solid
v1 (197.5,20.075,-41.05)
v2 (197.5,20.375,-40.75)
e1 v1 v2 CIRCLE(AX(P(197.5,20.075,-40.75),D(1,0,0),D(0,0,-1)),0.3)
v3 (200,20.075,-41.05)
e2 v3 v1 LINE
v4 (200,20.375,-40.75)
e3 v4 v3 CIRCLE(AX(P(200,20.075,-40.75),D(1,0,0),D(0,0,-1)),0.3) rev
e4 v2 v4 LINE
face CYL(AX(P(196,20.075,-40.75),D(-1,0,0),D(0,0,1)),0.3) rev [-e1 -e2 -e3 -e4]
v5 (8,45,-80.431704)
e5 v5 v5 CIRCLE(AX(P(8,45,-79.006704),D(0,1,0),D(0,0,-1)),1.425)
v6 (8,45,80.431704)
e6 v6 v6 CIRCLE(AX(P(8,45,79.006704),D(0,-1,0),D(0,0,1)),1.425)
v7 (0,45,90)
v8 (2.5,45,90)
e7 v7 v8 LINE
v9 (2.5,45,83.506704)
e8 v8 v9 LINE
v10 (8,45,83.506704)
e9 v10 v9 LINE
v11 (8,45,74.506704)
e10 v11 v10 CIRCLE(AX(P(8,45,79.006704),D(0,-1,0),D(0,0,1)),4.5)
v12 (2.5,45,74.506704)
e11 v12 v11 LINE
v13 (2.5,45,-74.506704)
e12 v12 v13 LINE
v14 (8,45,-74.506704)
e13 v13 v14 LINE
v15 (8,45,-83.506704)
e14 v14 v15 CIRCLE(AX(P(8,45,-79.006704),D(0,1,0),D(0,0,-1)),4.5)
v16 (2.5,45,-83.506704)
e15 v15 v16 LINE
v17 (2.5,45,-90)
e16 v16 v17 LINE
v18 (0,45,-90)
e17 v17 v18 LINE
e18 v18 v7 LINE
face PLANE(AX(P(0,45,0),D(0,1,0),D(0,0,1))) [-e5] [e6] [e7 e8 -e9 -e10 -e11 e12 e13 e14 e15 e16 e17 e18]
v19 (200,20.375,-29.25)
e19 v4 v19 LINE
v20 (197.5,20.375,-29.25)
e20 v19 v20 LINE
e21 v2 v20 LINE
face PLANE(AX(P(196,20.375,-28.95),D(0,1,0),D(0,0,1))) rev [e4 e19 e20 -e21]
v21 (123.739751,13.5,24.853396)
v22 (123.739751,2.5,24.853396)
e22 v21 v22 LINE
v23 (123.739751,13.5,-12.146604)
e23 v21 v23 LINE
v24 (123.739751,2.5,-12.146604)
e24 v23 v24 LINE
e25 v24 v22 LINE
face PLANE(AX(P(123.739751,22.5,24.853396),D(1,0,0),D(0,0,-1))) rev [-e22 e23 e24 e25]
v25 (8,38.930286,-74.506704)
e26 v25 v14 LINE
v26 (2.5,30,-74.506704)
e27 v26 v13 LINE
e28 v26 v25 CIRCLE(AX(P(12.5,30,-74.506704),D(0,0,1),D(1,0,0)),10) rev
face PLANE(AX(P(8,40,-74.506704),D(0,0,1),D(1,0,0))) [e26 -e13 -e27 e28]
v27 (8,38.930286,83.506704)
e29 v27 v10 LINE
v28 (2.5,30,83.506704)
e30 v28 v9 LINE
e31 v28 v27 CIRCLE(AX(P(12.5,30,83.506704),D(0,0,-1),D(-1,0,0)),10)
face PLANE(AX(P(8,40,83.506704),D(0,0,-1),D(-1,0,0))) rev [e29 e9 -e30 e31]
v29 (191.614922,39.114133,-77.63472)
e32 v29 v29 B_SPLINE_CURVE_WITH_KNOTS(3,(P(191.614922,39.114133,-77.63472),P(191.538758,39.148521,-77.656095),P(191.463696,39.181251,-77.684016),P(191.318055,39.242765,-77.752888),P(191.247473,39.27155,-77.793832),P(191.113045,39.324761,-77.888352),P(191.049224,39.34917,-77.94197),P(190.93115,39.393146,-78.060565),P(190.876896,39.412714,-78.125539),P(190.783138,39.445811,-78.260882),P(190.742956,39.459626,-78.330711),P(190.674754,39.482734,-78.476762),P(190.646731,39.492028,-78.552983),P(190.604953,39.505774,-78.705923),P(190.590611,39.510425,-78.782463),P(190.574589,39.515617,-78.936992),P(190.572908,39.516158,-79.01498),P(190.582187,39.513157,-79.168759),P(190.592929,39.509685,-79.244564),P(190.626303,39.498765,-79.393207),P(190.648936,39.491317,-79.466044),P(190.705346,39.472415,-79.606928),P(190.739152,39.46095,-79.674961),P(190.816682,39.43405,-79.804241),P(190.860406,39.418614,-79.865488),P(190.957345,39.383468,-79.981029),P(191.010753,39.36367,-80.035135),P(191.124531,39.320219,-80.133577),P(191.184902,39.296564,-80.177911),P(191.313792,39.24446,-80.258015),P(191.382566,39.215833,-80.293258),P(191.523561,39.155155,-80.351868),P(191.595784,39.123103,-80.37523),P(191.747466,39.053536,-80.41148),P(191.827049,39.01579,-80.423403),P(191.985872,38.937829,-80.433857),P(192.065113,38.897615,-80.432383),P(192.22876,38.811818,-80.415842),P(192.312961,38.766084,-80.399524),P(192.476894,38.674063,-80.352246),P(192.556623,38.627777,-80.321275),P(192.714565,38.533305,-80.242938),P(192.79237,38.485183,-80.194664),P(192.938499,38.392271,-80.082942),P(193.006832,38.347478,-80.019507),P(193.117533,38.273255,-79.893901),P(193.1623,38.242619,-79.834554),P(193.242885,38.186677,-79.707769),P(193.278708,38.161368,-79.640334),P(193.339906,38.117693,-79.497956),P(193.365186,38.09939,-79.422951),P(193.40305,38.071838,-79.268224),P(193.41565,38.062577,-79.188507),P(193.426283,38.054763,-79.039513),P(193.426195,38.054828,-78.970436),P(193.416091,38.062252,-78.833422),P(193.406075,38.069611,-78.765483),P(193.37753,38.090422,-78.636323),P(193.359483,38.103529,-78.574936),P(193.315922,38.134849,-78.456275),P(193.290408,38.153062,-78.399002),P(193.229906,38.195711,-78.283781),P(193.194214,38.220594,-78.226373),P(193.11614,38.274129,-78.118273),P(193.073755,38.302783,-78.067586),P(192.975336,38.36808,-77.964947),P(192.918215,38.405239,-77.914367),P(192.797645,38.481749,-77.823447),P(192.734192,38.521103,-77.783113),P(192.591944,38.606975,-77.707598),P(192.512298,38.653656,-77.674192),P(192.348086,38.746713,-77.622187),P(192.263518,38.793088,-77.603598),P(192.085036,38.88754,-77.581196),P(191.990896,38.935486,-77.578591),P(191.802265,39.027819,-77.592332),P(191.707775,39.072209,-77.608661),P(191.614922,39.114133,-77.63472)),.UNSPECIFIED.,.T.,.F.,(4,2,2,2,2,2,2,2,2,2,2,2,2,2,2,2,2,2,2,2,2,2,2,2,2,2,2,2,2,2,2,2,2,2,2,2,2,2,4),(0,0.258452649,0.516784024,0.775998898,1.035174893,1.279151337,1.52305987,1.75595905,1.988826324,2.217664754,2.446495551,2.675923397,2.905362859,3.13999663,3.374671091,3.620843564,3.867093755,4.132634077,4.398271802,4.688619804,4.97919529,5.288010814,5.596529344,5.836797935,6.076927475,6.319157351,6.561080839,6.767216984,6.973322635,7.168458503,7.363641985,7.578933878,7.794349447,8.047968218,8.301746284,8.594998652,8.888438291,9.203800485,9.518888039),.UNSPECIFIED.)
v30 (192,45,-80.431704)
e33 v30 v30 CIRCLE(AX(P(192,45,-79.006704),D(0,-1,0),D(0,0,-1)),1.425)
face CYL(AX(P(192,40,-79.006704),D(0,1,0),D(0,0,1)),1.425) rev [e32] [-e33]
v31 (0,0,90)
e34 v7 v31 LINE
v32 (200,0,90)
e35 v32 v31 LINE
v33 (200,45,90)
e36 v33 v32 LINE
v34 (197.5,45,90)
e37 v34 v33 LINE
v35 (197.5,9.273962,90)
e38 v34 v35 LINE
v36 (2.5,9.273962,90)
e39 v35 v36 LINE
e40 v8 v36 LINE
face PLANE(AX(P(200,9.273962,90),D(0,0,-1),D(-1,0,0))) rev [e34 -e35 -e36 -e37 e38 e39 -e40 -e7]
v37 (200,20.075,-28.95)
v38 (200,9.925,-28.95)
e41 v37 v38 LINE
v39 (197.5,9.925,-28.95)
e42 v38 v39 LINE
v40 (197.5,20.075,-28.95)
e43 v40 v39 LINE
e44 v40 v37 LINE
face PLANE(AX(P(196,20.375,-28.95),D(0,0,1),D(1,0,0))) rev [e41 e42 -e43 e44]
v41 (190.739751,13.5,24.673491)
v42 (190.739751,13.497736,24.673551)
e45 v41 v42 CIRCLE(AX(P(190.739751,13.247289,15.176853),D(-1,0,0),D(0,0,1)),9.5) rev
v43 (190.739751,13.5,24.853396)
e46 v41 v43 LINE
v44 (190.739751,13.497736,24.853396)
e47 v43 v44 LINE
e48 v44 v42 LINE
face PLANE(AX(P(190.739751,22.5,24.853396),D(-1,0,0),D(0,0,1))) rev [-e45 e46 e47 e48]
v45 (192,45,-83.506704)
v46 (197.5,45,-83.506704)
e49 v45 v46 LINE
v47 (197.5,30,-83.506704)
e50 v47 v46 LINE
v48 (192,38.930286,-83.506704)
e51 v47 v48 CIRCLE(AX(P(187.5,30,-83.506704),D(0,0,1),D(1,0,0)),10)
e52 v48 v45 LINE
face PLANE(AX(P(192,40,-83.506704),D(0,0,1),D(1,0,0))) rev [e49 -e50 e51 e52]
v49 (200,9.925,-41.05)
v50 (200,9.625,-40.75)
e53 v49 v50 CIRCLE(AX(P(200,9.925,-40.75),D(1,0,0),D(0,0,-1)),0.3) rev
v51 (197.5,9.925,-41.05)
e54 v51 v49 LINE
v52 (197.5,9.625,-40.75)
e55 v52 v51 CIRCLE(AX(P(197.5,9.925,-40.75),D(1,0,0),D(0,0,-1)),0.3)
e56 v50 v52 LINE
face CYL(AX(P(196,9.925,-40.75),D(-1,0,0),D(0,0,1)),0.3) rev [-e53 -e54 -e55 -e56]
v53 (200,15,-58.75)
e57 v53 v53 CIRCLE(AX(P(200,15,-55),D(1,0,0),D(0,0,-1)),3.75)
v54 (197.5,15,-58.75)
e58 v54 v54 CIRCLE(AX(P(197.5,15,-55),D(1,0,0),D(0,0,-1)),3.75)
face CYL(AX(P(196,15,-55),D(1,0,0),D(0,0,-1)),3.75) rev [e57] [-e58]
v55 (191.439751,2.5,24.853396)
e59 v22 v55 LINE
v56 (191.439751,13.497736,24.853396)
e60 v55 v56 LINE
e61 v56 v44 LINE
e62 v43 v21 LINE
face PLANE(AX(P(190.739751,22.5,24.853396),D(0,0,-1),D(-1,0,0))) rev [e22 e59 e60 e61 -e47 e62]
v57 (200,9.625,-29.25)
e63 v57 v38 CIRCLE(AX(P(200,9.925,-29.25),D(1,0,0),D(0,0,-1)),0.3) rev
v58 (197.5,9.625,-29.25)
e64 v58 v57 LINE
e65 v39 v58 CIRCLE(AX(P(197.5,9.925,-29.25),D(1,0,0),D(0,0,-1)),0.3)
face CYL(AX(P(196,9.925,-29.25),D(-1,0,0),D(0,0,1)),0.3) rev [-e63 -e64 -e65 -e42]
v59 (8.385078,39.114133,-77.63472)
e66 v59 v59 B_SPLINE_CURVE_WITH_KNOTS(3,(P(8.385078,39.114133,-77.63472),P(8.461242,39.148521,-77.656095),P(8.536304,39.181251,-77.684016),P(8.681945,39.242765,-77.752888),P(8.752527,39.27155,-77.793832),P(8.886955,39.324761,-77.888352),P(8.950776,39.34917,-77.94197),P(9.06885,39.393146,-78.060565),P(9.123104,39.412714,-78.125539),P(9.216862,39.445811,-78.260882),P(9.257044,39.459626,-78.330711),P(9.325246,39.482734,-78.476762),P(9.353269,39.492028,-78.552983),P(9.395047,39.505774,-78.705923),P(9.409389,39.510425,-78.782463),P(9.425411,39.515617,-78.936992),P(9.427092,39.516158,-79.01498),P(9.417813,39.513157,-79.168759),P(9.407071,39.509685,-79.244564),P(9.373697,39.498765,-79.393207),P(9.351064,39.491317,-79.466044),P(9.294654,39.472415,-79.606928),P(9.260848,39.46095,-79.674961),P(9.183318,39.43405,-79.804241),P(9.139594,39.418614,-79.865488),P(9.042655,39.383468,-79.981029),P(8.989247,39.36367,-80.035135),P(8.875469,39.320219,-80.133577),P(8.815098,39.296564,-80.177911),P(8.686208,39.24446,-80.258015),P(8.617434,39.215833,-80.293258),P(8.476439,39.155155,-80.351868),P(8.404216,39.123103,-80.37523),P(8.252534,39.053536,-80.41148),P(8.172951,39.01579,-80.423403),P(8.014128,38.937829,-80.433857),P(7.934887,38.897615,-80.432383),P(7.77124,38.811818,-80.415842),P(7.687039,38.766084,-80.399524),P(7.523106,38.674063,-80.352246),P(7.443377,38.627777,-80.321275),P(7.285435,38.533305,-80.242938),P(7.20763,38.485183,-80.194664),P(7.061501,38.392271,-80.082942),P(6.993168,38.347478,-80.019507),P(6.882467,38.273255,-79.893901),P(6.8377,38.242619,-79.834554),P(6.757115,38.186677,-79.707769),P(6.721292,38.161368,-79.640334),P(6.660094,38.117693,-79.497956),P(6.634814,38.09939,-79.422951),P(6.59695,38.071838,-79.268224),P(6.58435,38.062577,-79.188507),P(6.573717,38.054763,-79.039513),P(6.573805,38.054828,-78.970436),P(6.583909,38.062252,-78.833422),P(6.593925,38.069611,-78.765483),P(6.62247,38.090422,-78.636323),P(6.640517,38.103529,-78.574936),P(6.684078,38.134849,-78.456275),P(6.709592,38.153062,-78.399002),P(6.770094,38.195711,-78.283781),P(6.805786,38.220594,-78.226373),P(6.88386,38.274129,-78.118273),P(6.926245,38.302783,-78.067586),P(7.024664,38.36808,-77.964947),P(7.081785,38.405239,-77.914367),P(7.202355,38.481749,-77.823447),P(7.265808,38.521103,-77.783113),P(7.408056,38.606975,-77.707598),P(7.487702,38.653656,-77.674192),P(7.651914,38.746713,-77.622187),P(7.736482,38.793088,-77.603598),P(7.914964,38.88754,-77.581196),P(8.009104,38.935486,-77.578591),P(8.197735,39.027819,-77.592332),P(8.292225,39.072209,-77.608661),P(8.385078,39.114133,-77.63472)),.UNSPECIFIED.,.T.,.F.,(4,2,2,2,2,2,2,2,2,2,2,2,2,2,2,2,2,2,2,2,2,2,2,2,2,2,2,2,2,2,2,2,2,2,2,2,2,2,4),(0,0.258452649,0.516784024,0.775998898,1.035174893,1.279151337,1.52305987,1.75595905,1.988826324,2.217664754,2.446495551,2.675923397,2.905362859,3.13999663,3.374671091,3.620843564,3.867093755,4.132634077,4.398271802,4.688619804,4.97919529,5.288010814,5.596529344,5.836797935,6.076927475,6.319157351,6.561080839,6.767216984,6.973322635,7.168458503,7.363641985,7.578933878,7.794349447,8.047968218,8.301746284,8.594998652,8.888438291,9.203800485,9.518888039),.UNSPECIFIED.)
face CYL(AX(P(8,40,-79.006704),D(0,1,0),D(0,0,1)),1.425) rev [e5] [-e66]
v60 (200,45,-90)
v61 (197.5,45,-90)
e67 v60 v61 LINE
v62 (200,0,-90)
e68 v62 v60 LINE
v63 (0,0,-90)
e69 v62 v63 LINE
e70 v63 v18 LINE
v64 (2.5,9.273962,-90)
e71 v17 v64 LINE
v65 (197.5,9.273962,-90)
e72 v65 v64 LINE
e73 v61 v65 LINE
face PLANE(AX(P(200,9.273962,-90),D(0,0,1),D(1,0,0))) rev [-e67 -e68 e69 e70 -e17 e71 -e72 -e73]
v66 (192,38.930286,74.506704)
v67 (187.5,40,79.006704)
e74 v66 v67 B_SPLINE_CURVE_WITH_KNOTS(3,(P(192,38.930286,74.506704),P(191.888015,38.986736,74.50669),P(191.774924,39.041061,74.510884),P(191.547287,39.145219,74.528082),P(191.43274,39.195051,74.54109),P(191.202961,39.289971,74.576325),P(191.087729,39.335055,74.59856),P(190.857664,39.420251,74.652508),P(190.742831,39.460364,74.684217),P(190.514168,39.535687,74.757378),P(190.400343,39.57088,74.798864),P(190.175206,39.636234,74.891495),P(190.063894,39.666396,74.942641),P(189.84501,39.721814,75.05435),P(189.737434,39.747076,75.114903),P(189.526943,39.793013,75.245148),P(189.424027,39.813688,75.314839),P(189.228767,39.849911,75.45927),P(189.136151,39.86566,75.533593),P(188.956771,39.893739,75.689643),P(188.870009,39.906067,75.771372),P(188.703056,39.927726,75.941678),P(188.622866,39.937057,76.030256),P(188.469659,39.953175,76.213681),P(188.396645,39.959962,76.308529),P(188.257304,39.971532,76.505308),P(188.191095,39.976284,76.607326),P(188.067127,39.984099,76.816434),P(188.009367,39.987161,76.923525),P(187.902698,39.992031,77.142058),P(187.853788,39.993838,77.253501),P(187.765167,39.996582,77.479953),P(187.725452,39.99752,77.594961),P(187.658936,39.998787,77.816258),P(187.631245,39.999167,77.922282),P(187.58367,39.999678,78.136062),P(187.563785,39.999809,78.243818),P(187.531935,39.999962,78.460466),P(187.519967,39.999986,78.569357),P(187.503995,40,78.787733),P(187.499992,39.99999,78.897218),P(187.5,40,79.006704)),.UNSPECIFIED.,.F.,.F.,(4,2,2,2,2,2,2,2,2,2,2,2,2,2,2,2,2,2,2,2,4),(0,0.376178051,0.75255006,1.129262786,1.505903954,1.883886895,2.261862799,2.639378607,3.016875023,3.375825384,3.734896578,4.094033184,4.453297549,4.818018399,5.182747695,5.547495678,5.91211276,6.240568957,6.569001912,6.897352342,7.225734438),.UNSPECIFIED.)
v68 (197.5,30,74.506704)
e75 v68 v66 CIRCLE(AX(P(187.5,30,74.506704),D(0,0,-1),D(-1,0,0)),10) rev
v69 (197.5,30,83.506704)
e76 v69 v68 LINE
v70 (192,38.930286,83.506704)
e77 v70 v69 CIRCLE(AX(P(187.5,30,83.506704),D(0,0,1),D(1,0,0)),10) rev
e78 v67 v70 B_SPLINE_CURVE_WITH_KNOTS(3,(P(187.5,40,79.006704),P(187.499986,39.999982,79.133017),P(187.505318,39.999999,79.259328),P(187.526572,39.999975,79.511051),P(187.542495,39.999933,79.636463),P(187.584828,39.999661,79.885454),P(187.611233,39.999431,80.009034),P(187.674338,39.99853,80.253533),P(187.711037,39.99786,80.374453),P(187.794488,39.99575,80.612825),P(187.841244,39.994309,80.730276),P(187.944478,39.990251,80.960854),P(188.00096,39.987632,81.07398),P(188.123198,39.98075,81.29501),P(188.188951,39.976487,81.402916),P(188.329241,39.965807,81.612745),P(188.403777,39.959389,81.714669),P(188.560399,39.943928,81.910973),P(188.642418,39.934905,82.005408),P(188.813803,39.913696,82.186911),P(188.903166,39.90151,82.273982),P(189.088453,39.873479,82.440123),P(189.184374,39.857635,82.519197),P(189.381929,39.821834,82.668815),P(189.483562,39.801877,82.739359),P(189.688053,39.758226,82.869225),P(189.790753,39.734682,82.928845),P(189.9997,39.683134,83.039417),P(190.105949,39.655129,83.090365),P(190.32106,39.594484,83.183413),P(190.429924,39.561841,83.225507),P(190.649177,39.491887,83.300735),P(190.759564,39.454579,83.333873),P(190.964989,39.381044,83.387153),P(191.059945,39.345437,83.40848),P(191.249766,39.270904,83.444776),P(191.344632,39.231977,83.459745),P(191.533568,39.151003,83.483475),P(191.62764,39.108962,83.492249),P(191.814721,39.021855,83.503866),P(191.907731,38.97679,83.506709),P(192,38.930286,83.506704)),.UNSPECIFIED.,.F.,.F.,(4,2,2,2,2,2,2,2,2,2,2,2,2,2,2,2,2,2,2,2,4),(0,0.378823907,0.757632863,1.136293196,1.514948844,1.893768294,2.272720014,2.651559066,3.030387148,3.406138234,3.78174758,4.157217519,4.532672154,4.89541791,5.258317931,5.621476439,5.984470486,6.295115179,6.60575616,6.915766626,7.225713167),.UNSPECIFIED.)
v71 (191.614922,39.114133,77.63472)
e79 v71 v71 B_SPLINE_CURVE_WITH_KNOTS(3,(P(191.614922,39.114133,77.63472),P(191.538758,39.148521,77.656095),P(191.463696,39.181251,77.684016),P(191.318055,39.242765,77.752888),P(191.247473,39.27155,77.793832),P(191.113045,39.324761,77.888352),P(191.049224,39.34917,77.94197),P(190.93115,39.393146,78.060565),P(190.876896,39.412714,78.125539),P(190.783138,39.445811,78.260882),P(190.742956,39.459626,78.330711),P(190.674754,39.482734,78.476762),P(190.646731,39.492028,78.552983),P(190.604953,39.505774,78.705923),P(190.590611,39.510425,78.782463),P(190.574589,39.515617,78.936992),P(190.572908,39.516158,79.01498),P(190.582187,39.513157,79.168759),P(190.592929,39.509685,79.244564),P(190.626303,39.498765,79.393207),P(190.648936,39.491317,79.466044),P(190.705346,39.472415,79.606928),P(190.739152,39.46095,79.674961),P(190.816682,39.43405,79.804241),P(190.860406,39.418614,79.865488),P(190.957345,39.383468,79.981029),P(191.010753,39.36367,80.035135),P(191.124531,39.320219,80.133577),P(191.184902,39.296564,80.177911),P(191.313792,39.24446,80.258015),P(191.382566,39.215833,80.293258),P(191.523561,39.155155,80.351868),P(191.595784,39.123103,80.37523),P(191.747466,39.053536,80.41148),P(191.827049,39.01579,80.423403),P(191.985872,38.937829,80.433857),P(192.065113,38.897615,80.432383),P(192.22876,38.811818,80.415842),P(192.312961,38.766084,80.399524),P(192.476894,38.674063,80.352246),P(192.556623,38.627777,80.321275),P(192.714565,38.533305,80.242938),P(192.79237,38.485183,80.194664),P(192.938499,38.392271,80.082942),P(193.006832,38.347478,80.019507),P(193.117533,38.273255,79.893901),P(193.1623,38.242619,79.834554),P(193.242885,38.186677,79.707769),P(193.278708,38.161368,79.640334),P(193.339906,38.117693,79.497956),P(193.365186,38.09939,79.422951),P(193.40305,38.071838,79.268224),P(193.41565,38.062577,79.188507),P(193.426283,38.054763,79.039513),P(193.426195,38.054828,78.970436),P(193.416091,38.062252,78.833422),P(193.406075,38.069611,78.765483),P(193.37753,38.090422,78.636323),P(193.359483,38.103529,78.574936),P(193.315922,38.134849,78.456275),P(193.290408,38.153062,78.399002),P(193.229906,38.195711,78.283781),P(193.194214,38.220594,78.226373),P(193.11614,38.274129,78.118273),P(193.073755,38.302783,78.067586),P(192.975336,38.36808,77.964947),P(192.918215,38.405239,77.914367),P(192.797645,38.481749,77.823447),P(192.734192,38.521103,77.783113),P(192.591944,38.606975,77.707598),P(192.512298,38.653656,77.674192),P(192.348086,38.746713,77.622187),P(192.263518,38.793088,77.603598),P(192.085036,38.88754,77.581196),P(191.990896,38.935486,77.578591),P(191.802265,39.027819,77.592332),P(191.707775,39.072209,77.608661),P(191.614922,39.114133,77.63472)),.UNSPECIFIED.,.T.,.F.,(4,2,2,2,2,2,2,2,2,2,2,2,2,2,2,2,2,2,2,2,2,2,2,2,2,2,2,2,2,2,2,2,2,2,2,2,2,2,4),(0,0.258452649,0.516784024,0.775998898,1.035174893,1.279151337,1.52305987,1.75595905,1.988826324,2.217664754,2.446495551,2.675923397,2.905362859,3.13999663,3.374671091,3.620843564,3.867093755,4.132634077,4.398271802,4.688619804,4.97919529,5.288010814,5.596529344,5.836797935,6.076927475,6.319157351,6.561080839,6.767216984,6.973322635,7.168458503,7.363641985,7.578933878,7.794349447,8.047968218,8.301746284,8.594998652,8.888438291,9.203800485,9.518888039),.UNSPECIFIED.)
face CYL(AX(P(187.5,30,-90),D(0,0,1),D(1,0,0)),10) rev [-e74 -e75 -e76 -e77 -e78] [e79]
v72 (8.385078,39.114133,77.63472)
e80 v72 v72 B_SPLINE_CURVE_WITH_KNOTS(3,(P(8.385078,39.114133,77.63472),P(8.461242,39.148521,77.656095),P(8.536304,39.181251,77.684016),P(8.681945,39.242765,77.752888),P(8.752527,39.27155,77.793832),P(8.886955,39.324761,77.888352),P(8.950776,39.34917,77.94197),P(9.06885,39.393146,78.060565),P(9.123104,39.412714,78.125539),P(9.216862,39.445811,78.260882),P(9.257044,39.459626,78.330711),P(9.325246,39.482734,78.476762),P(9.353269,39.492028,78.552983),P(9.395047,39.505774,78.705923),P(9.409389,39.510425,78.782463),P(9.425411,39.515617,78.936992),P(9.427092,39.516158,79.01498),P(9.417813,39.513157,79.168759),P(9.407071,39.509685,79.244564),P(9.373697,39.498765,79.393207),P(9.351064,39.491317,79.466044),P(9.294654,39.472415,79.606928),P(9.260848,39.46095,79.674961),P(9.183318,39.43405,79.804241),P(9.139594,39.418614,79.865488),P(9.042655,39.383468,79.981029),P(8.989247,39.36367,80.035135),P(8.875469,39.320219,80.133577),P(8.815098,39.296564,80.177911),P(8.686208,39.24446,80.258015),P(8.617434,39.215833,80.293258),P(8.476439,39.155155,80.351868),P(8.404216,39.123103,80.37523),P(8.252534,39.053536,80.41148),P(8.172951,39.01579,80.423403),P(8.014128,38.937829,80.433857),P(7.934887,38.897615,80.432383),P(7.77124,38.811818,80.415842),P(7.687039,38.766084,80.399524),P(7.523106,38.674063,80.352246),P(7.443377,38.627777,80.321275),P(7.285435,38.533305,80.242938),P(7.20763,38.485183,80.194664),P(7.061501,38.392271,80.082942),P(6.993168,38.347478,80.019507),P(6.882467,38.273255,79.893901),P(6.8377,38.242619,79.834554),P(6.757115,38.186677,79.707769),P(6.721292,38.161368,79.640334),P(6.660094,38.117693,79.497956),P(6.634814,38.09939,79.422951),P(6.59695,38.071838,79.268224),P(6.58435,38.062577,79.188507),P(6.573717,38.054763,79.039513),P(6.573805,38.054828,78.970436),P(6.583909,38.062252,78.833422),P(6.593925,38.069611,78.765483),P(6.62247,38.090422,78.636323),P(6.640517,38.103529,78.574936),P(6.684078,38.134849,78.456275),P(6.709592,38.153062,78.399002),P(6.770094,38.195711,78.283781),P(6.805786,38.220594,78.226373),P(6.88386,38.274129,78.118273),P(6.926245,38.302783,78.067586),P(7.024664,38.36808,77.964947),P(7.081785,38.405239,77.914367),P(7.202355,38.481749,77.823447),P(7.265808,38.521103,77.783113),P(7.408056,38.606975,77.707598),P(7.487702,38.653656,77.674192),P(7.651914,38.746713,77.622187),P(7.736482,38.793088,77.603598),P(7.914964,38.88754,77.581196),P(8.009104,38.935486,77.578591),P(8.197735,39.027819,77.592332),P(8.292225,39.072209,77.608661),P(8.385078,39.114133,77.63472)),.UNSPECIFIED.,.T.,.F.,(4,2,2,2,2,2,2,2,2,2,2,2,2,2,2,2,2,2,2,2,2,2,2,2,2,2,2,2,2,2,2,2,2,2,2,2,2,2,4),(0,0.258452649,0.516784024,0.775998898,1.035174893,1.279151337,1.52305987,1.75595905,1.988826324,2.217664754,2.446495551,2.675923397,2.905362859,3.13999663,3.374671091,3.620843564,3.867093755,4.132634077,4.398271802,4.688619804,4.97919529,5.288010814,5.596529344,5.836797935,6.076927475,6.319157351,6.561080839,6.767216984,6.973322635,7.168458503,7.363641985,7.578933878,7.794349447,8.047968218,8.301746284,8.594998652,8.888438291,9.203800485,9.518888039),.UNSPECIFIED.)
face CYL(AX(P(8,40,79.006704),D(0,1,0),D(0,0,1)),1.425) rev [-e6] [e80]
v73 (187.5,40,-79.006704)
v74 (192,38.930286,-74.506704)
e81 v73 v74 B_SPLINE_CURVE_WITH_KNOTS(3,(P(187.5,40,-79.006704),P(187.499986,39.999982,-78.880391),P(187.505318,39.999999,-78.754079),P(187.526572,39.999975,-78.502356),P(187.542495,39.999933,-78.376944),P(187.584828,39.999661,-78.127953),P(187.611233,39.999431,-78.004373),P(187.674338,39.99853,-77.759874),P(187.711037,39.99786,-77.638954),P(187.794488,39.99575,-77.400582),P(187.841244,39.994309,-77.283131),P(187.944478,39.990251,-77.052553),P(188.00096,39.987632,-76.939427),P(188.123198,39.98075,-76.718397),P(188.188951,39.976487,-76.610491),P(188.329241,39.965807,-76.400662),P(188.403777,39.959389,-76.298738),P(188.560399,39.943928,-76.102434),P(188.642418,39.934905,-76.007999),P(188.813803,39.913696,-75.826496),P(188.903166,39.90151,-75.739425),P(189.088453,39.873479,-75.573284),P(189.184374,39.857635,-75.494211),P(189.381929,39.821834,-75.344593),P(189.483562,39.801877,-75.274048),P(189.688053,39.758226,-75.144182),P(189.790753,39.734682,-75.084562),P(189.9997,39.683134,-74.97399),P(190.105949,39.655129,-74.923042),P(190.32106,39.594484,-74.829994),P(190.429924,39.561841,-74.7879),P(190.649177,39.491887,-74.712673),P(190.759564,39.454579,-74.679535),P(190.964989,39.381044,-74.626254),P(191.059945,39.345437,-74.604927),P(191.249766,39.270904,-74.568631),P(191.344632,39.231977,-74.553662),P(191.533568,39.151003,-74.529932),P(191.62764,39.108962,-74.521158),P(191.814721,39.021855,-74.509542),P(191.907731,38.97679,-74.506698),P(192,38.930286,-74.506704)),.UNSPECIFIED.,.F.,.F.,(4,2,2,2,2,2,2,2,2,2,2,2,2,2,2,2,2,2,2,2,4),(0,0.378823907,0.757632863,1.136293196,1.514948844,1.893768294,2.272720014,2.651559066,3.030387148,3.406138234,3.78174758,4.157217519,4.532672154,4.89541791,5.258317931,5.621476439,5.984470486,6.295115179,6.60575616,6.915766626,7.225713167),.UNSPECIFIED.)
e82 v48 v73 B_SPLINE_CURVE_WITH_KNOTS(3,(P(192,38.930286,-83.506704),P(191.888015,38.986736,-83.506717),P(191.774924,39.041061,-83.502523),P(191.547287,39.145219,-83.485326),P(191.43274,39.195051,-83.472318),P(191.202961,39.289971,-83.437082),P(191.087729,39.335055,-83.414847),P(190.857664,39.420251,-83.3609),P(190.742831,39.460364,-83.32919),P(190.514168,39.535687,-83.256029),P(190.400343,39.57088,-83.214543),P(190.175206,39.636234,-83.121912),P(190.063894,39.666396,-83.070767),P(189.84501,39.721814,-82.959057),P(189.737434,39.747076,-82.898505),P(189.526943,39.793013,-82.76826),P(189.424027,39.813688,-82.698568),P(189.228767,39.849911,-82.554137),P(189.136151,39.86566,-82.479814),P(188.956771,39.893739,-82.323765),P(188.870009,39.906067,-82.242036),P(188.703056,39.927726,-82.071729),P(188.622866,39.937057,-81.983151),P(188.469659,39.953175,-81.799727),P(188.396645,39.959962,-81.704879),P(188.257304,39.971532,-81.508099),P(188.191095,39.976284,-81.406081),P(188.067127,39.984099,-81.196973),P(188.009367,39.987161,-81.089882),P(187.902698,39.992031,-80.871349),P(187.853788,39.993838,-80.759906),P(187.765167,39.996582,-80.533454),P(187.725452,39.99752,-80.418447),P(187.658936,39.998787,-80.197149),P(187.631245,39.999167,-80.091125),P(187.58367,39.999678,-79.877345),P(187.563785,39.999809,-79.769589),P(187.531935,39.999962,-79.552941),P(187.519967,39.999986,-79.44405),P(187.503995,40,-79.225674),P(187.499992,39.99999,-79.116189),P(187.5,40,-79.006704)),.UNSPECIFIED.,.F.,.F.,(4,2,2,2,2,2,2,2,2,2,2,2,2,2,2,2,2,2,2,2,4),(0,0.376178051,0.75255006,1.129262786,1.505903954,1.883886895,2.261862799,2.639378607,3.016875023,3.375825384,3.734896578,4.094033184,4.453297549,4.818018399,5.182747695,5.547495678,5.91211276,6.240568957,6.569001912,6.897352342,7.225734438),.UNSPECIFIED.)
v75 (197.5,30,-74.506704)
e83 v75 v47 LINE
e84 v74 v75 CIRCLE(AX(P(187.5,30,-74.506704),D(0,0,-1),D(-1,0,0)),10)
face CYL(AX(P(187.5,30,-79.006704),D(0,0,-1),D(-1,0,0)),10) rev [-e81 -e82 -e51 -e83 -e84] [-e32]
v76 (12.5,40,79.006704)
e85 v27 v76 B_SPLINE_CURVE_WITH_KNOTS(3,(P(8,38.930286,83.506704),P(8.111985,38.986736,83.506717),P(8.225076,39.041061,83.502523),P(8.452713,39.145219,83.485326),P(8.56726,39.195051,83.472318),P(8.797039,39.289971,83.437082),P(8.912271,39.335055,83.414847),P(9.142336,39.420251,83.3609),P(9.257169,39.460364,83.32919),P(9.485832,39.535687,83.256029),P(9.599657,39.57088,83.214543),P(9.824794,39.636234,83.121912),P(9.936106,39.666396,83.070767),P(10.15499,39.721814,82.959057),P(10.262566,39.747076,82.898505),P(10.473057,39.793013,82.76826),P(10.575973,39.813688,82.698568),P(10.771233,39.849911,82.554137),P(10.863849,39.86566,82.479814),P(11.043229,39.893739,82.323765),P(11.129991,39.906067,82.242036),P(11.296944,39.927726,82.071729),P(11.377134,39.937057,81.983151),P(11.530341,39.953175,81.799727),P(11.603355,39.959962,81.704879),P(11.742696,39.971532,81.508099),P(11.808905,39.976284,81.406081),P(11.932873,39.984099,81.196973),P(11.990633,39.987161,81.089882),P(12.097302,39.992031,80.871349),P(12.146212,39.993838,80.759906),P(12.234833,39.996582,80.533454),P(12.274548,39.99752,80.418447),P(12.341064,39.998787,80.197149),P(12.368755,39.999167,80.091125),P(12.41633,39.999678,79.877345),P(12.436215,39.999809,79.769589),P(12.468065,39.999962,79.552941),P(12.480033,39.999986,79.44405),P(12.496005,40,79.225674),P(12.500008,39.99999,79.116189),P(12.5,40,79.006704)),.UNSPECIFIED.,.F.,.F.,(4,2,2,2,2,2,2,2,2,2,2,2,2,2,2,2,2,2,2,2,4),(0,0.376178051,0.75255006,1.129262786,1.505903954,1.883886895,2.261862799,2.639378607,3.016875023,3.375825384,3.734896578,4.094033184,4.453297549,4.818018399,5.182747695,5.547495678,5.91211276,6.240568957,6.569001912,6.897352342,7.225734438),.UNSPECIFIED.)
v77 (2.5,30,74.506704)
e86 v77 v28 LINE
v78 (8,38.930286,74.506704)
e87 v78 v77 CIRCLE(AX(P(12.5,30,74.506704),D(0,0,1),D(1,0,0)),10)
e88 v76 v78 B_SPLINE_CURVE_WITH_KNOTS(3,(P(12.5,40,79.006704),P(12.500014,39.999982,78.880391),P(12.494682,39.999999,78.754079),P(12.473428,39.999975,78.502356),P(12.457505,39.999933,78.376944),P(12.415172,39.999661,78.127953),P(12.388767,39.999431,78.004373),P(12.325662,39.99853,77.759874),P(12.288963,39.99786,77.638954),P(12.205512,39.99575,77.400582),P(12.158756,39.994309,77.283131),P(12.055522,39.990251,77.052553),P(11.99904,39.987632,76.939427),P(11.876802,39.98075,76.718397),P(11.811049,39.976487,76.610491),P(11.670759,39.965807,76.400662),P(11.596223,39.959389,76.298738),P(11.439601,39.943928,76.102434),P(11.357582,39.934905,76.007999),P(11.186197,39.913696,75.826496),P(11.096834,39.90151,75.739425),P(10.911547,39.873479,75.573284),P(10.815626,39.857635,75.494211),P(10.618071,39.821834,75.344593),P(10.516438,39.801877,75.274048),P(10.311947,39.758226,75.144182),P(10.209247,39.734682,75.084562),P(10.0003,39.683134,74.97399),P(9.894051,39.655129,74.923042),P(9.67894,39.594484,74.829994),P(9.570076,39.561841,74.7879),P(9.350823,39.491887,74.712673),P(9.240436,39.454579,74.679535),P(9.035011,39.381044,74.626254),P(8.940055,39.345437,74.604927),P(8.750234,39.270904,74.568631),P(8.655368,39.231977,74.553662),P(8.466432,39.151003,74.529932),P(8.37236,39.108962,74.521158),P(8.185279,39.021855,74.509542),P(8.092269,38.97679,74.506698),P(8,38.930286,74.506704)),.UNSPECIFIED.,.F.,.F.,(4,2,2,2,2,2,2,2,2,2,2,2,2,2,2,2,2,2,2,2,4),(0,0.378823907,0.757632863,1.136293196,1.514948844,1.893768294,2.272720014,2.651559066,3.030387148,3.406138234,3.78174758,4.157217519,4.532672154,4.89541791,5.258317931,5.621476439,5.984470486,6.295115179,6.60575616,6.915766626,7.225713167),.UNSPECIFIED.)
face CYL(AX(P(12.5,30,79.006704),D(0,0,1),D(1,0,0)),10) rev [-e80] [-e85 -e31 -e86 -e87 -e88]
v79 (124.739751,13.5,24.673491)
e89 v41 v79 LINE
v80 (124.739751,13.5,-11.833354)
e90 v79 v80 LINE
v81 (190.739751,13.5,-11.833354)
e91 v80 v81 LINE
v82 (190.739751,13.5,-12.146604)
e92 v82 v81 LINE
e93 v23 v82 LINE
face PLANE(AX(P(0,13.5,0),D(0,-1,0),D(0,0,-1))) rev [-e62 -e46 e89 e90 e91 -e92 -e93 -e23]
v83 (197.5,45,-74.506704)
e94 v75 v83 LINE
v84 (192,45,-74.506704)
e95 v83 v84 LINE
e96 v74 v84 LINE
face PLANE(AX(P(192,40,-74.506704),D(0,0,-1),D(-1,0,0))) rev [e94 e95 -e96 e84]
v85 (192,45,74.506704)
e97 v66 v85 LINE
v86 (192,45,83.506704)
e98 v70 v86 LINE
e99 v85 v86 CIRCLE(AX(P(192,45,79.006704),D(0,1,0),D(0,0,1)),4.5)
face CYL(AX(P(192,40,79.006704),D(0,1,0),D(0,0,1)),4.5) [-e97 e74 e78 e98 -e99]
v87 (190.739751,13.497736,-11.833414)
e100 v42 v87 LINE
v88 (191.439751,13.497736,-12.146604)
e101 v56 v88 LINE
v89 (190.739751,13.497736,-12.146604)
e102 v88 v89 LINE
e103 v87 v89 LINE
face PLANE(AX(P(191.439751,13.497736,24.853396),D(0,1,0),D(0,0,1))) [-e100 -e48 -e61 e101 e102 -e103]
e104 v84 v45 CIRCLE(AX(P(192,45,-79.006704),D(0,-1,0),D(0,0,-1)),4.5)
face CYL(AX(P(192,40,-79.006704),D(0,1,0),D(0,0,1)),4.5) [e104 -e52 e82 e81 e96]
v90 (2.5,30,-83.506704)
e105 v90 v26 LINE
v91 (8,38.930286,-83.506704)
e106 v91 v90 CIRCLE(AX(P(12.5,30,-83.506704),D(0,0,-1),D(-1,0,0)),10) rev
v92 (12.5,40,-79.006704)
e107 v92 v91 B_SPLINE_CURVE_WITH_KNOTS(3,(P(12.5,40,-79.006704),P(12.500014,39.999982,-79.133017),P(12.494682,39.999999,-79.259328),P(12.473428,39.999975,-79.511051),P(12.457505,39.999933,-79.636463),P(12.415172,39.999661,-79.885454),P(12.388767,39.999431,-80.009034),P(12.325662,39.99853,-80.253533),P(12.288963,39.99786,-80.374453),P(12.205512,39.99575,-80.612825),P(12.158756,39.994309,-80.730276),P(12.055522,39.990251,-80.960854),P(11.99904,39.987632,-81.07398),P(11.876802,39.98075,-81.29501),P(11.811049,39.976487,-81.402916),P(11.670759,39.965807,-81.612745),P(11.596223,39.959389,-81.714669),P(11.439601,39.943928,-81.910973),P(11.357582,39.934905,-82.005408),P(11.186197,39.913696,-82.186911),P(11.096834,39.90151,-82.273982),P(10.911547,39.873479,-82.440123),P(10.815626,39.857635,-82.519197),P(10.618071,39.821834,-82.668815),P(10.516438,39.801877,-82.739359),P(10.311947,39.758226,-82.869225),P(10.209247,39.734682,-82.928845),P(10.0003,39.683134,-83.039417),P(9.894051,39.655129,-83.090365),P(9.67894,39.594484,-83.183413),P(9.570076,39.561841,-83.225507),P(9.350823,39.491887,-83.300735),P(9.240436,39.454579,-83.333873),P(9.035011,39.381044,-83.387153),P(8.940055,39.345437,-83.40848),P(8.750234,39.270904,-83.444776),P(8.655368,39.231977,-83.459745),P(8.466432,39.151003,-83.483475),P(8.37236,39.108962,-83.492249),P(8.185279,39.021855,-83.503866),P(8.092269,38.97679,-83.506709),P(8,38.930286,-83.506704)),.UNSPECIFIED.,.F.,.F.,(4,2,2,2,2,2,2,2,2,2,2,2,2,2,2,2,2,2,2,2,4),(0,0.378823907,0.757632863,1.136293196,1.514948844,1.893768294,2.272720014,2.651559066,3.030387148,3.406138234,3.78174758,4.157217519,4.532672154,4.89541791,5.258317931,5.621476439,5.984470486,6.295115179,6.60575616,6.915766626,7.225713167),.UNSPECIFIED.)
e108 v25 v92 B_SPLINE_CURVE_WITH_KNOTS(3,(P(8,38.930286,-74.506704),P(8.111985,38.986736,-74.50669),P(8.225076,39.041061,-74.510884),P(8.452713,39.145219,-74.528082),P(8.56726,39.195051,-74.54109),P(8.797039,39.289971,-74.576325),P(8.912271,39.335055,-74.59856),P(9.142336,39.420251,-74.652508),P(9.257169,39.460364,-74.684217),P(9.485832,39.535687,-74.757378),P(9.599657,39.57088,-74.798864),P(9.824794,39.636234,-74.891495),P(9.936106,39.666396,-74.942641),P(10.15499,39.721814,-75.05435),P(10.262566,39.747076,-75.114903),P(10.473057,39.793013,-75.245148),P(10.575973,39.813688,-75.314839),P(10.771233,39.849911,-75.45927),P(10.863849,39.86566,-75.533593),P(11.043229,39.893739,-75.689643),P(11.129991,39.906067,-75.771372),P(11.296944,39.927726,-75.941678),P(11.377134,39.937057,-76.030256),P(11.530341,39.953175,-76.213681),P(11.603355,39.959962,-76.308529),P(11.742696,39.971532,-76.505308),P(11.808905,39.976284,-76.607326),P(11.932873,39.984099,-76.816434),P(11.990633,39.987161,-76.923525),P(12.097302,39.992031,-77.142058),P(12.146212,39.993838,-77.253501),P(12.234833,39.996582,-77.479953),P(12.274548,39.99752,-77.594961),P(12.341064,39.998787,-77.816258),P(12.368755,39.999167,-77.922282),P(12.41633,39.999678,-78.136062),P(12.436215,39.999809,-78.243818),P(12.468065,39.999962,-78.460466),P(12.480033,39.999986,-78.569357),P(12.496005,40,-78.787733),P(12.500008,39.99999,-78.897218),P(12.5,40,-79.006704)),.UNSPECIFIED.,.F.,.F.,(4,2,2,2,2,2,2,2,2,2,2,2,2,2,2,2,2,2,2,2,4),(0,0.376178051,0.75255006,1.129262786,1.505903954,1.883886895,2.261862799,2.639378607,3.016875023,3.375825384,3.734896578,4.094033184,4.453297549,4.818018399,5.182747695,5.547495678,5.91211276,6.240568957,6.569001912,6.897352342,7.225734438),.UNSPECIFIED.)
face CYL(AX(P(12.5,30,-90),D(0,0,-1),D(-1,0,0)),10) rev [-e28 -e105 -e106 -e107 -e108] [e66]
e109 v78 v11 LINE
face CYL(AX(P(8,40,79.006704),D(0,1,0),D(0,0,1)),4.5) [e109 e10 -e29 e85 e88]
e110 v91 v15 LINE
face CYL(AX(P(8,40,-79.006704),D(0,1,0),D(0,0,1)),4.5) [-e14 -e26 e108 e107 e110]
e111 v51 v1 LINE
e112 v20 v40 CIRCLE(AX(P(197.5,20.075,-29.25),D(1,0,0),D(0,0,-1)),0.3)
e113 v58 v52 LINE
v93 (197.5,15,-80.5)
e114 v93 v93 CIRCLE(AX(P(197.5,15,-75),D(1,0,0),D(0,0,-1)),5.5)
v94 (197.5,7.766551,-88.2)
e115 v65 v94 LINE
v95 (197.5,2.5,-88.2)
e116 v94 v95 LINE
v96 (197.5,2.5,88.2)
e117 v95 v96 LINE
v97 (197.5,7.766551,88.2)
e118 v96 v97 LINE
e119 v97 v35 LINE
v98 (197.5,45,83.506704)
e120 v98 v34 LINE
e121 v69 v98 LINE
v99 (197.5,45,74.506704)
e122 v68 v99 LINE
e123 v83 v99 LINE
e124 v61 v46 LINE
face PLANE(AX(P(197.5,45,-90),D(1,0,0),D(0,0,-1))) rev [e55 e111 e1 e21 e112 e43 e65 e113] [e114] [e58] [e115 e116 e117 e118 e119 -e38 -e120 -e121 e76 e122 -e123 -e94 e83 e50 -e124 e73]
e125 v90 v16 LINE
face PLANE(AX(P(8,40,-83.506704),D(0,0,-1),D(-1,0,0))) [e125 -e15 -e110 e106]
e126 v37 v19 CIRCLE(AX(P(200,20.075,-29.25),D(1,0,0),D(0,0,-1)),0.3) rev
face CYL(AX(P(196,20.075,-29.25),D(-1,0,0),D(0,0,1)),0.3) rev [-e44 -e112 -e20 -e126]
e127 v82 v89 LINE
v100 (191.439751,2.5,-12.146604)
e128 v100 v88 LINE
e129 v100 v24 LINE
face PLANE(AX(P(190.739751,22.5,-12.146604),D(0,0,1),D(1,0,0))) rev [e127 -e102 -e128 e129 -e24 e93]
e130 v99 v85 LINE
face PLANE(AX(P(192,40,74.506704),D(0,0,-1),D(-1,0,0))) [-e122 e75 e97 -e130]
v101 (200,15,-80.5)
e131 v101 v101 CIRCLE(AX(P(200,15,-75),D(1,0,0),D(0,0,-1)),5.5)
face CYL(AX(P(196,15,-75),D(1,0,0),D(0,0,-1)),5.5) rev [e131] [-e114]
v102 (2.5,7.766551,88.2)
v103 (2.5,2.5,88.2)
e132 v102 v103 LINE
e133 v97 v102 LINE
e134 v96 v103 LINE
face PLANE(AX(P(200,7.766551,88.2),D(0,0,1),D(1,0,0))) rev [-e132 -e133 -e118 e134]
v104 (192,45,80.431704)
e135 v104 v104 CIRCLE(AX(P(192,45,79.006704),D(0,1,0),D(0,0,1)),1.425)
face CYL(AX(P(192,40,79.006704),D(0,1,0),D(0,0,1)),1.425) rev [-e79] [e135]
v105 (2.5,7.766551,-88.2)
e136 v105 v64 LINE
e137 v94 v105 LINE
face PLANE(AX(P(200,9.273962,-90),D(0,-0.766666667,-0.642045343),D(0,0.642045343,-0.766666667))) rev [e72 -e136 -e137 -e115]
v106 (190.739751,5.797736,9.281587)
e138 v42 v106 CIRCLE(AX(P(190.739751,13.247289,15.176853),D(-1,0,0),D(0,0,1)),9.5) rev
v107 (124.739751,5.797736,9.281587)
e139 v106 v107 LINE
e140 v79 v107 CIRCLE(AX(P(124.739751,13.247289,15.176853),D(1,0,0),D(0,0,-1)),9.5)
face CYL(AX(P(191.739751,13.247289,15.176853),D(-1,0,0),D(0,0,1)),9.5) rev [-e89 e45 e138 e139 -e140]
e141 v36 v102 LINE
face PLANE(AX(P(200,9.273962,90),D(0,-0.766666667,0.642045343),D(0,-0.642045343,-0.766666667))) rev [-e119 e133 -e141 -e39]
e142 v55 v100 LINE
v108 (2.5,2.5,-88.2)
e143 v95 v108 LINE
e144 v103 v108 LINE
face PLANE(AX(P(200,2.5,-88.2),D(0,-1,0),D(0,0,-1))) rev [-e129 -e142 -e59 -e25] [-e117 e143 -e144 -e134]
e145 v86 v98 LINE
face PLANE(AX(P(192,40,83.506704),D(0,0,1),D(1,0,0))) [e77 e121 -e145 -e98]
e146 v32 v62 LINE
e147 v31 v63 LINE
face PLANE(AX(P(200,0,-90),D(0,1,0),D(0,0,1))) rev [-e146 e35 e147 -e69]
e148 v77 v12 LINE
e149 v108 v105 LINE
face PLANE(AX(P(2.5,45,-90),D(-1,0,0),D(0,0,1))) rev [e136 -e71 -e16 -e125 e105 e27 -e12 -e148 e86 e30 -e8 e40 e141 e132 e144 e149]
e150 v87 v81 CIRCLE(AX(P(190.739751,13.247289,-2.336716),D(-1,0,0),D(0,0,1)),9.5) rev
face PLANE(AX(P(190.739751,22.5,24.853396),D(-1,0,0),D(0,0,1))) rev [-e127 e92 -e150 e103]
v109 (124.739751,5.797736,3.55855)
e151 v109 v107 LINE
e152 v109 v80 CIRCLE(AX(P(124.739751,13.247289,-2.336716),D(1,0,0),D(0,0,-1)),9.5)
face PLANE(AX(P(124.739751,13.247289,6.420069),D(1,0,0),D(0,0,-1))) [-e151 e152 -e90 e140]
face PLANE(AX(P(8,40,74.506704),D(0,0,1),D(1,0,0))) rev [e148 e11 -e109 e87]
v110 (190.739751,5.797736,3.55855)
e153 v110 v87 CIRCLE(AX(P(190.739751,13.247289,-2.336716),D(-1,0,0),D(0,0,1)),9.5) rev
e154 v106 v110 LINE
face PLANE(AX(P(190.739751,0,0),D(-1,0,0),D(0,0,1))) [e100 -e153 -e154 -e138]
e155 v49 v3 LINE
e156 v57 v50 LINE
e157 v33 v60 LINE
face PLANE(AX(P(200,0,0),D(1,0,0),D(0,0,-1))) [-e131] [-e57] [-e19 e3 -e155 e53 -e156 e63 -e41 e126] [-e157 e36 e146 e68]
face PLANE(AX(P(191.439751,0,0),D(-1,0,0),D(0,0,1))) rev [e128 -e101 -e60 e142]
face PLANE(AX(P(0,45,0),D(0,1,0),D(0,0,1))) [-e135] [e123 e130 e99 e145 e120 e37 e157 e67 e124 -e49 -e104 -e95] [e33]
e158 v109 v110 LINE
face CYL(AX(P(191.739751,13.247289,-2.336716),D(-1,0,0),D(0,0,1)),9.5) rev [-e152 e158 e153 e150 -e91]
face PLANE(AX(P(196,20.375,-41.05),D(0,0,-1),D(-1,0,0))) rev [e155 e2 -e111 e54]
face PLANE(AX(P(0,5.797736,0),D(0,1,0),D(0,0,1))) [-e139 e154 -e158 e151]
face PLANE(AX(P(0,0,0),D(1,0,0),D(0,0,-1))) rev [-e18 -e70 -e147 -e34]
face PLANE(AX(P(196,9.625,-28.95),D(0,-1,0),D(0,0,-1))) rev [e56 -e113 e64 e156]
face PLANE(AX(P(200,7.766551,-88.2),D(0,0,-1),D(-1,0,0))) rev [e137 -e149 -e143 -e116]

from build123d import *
from build123d.topology import SkipClean

# Parameters (mm, degrees)
SALIENTE_EXTRUIR1_DEPTH    = 200
CROQUIS2_W                 = 2.5
CROQUIS2_H                 = 180
SALIENTE_EXTRUIR2_DEPTH    = 42.5
CROQUIS3_R                 = 5.5
CORTAR_EXTRUIR1_DEPTH      = 4
CROQUIS4_R                 = 3.75
CORTAR_EXTRUIR2_DEPTH      = 4
CROQUIS7_W                 = 12.1
CROQUIS7_H                 = 10.75
CORTAR_EXTRUIR3_DEPTH      = 4
REDONDEO1_R                = 0.3
CROQUIS8_R                 = 1.425
SALIENTE_EXTRUIR3_DEPTH    = 5
SIMETR_A2_COPY_1_SKETCH_R  = 1.425
SIMETR_A2_COPY_1_DEPTH     = 5
REDONDEO4_START            = 29.9999999
REDONDEO4_OUTLINE_R        = 1.425
REDONDEO4_DEPTH            = 10.0000001
REDONDEO4_2_OUTLINE_W      = 10
REDONDEO4_2_OUTLINE_H      = 9.000004552
REDONDEO4_2_OUTLINE_H_2    = 9.000004551
REDONDEO5_START            = 29.9999999
REDONDEO5_OUTLINE_R        = 1.425
REDONDEO5_DEPTH            = 10.0000001
REDONDEO5_2_OUTLINE_W      = 10
REDONDEO5_2_OUTLINE_H      = 9.000004551
REDONDEO5_2_OUTLINE_H_2    = 9.000004552
CROQUIS9_W                 = 67
CROQUIS9_H                 = 37
SALIENTE_EXTRUIR4_DEPTH    = 20
CORTAR_EXTRUIR5_DEPTH      = 1
CORTAR_EXTRUIR5_DEPTH_BACK = 66
CROQUIS11_W                = 69.586098965
CROQUIS11_H                = 38.970086607
CORTAR_EXTRUIR6_DEPTH      = 9
CROQUIS12_W                = 37
CROQUIS12_H                = 10.997736301
SALIENTE_EXTRUIR5_DEPTH    = 0.7
CROQUIS14_W                = 66
CROQUIS14_H                = 7.054690465
CORTAR_EXTRUIR7_DEPTH      = 7.7


with BuildPart() as part:
    # Croquis1 → Saliente-Extruir1 (new body)
    with BuildSketch(Plane(origin=(0, 0, 0), x_dir=(0, 0, -1), z_dir=(1, 0, 0))):
        Polygon((90, 9.273962115), (90, 0), (-90, 0), (-90, 9.273962115), (-88.2, 7.766551311), (-88.2, 2.5), (88.2, 2.5), (88.2, 7.766551311), align=None)
    extrude(amount=SALIENTE_EXTRUIR1_DEPTH)

    # Croquis2 → Saliente-Extruir2 (add)
    with BuildSketch(Plane(origin=(0, 2.5, 0), x_dir=(1, 0, 0), z_dir=(0, 1, 0))):
        with Locations((198.75, 0)):
            Rectangle(CROQUIS2_W, CROQUIS2_H)
        with Locations((1.25, 0)):
            Rectangle(CROQUIS2_W, CROQUIS2_H)
    extrude(amount=SALIENTE_EXTRUIR2_DEPTH)

    # Croquis3 → Cortar-Extruir1 (cut)
    with BuildSketch(Plane(origin=(200, 0, 0), x_dir=(0, 0, -1), z_dir=(1, 0, 0))):
        with Locations((75, 15)):
            Circle(CROQUIS3_R)
    extrude(amount=-CORTAR_EXTRUIR1_DEPTH, mode=Mode.SUBTRACT)

    # Croquis4 → Cortar-Extruir2 (cut)
    with BuildSketch(Plane(origin=(200, 0, 0), x_dir=(0, 0, -1), z_dir=(1, 0, 0))):
        with Locations((55, 15)):
            Circle(CROQUIS4_R)
    extrude(amount=-CORTAR_EXTRUIR2_DEPTH, mode=Mode.SUBTRACT)

    # Croquis7 → Cortar-Extruir3 (cut)
    with BuildSketch(Plane(origin=(200, 0, 0), x_dir=(0, 0, -1), z_dir=(1, 0, 0))):
        with Locations((35, 15)):
            Rectangle(CROQUIS7_W, CROQUIS7_H)
    extrude(amount=-CORTAR_EXTRUIR3_DEPTH, mode=Mode.SUBTRACT)

    # Redondeo1
    redondeo1_edges = [part.edges().sort_by_distance(p)[0] for p in [
        (198.75, 20.375, -41.05),
        (198.75, 9.625, -41.05),
        (198.75, 9.625, -28.95),
        (198.75, 20.375, -28.95),
    ]]
    fillet(redondeo1_edges, radius=REDONDEO1_R)

    # Croquis8 → Saliente-Extruir3 (add)
    with BuildSketch(Plane(origin=(0, 45, 0), x_dir=(1, 0, 0), z_dir=(0, 1, 0))):
        with BuildLine():
            Line((192, -74.506703602), (197.5, -74.506703602))
            Line((197.5, -74.506703602), (197.5, -83.506703602))
            Line((197.5, -83.506703602), (192, -83.506703602))
            ThreePointArc((192, -83.506703602), (187.5, -79.006703602), (192, -74.506703602))
        make_face()
        with Locations(Location((192, -79.006703602, 0), (0, 0, 270))):
            Circle(CROQUIS8_R, mode=Mode.SUBTRACT)
    saliente_extruir3 = extrude(amount=-SALIENTE_EXTRUIR3_DEPTH)

    # Simetría1: Saliente-Extruir3 across plane
    add(saliente_extruir3.mirror(Plane.XY))

    # Simetría2: Saliente-Extruir3 across plane
    add(saliente_extruir3.mirror(Plane(origin=(100, 0, 0), x_dir=(0, 0, 1), z_dir=(1, 0, 0))))

    # Simetría2 copy 1 sketch → Simetría2 copy 1 (add)
    with BuildSketch(Plane(origin=(200, 45, 0), x_dir=(-1, 0, 0), z_dir=(0, 1, 0))):
        with BuildLine():
            Line((192, -74.506703602), (197.5, -74.506703602))
            Line((197.5, -74.506703602), (197.5, -83.506703602))
            Line((197.5, -83.506703602), (192, -83.506703602))
            ThreePointArc((192, -83.506703602), (187.5, -79.006703602), (192, -74.506703602))
        make_face()
        with Locations(Location((192, -79.006703602, 0), (0, 0, 270))):
            Circle(SIMETR_A2_COPY_1_SKETCH_R, mode=Mode.SUBTRACT)
    extrude(amount=-SIMETR_A2_COPY_1_DEPTH)

    # Redondeo4: read off the stored shape, not the designer's step
    # Redondeo4 outline → Redondeo4 (add)
    # profile 1 of 2: a face of its own
    with SkipClean():  # the faces are left unmerged after this step: merging them gives an invalid solid
        with BuildSketch(Plane(origin=(0, 0, 0), x_dir=(1, 0, 0), z_dir=(0, 1, 0)).offset(REDONDEO4_START)):
            with BuildLine():
                Line((197.5, -74.506703602), (192, -74.506703602))
                ThreePointArc((192, -74.506703602), (187.5, -79.006703602), (192, -83.506703602))
                Line((192, -83.506703602), (197.5, -83.506703602))
                Line((197.5, -83.506703602), (197.5, -74.506703602))
            make_face()
            with Locations((192, -79.006703602)):
                Circle(REDONDEO4_OUTLINE_R, mode=Mode.SUBTRACT)
        # profile 2 of 2: a face of its own
        with BuildSketch(Plane(origin=(0, 0, 0), x_dir=(1, 0, 0), z_dir=(0, 1, 0)).offset(REDONDEO4_START)):
            with BuildLine():
                Line((192, 74.506703602), (197.5, 74.506703602))
                Line((197.5, 74.506703602), (197.5, 83.506703602))
                Line((197.5, 83.506703602), (192, 83.506703602))
                ThreePointArc((192, 83.506703602), (187.5, 79.006703602), (192, 74.506703602))
            make_face()
            with Locations((192, 79.006703602)):
                Circle(REDONDEO4_OUTLINE_R, mode=Mode.SUBTRACT)
        extrude(amount=REDONDEO4_DEPTH)
    add(part.part.scale(1), mode=Mode.REPLACE)  # the faces are merged on a copy

    # Redondeo4 2 outline → Redondeo4 2 (revolve, cut)
    with BuildSketch(Plane(origin=(187.5, 30, 0), x_dir=(1, 0, 0), z_dir=(0, -1, 0))):
        with Locations((5, -79.006704338)):
            Rectangle(REDONDEO4_2_OUTLINE_W, REDONDEO4_2_OUTLINE_H)
        with Locations((5, 79.006702866)):
            Rectangle(REDONDEO4_2_OUTLINE_W, REDONDEO4_2_OUTLINE_H_2)
    revolve(axis=Axis((187.5, 30, 0), (0, 0, 1)), mode=Mode.SUBTRACT)

    # Redondeo5: read off the stored shape, not the designer's step
    # Redondeo5 outline → Redondeo5 (add)
    # profile 1 of 2: a face of its own
    with BuildSketch(Plane(origin=(0, 0, 0), x_dir=(1, 0, 0), z_dir=(0, 1, 0)).offset(REDONDEO5_START)):
        with BuildLine():
            Line((2.5, 83.506703602), (2.5, 74.506703602))
            Line((2.5, 74.506703602), (8, 74.506703602))
            ThreePointArc((8, 74.506703602), (12.5, 79.006703602), (8, 83.506703602))
            Line((8, 83.506703602), (2.5, 83.506703602))
        make_face()
        with Locations((8, 79.006703602)):
            Circle(REDONDEO5_OUTLINE_R, mode=Mode.SUBTRACT)
    # profile 2 of 2: a face of its own
    with BuildSketch(Plane(origin=(0, 0, 0), x_dir=(1, 0, 0), z_dir=(0, 1, 0)).offset(REDONDEO5_START)):
        with BuildLine():
            Line((8, -74.506703602), (2.5, -74.506703602))
            Line((2.5, -74.506703602), (2.5, -83.506703602))
            Line((2.5, -83.506703602), (8, -83.506703602))
            ThreePointArc((8, -83.506703602), (12.5, -79.006703602), (8, -74.506703602))
        make_face()
        with Locations((8, -79.006703602)):
            Circle(REDONDEO5_OUTLINE_R, mode=Mode.SUBTRACT)
    extrude(amount=REDONDEO5_DEPTH)

    # Redondeo5 2 outline → Redondeo5 2 (revolve, cut)
    with BuildSketch(Plane(origin=(12.5, 30, 0), x_dir=(1, 0, 0), z_dir=(0, -1, 0))):
        with Locations((5, -79.006702866)):
            Rectangle(REDONDEO5_2_OUTLINE_W, REDONDEO5_2_OUTLINE_H)
        with Locations((5, 79.006704338)):
            Rectangle(REDONDEO5_2_OUTLINE_W, REDONDEO5_2_OUTLINE_H_2)
    revolve(axis=Axis((12.5, 30, 0), (0, 0, 1)), mode=Mode.SUBTRACT)

    # Croquis9 → Saliente-Extruir4 (add)
    with BuildSketch(Plane(origin=(0, 2.5, 0), x_dir=(1, 0, 0), z_dir=(0, 1, 0))):
        with Locations((157.239750521, -6.353396278)):
            Rectangle(CROQUIS9_W, CROQUIS9_H)
    extrude(amount=SALIENTE_EXTRUIR4_DEPTH)

    # Croquis10 → Cortar-Extruir5 (cut, two sides: drawn at the far end of the back side and taken through both)
    with BuildSketch(Plane(origin=(190.739750521, 0, 0), x_dir=(0, 0, -1), z_dir=(1, 0, 0)).offset(-CORTAR_EXTRUIR5_DEPTH_BACK)):
        with BuildLine():
            ThreePointArc((-6.420068532, 16.930863921), (-24.676853259, 13.247289401), (-6.420068532, 9.563714882))
            ThreePointArc((-6.420068532, 9.563714882), (11.836716195, 13.247289401), (-6.420068532, 16.930863921))
        make_face()
    extrude(amount=CORTAR_EXTRUIR5_DEPTH + CORTAR_EXTRUIR5_DEPTH_BACK, mode=Mode.SUBTRACT)

    # Croquis11 → Cortar-Extruir6 (cut)
    with BuildSketch(Plane(origin=(0, 22.5, 0), x_dir=(1, 0, 0), z_dir=(0, 1, 0))):
        with Locations((157.239750521, -6.353396279)):
            Rectangle(CROQUIS11_W, CROQUIS11_H)
    extrude(amount=-CORTAR_EXTRUIR6_DEPTH, mode=Mode.SUBTRACT)

    # Croquis12 → Saliente-Extruir5 (add)
    with BuildSketch(Plane(origin=(190.739750521, 0, 0), x_dir=(0, 0, -1), z_dir=(1, 0, 0))):
        with Locations((-6.353396278, 7.998868151)):
            Rectangle(CROQUIS12_W, CROQUIS12_H)
    extrude(amount=SALIENTE_EXTRUIR5_DEPTH)

    # Croquis14 → Cortar-Extruir7 (cut)
    with BuildSketch(Plane(origin=(0, 13.497736301, 0), x_dir=(1, 0, 0), z_dir=(0, 1, 0))):
        with Locations((157.739750521, -6.420068533)):
            Rectangle(CROQUIS14_W, CROQUIS14_H)
    extrude(amount=-CORTAR_EXTRUIR7_DEPTH, mode=Mode.SUBTRACT)


solid = part.part
